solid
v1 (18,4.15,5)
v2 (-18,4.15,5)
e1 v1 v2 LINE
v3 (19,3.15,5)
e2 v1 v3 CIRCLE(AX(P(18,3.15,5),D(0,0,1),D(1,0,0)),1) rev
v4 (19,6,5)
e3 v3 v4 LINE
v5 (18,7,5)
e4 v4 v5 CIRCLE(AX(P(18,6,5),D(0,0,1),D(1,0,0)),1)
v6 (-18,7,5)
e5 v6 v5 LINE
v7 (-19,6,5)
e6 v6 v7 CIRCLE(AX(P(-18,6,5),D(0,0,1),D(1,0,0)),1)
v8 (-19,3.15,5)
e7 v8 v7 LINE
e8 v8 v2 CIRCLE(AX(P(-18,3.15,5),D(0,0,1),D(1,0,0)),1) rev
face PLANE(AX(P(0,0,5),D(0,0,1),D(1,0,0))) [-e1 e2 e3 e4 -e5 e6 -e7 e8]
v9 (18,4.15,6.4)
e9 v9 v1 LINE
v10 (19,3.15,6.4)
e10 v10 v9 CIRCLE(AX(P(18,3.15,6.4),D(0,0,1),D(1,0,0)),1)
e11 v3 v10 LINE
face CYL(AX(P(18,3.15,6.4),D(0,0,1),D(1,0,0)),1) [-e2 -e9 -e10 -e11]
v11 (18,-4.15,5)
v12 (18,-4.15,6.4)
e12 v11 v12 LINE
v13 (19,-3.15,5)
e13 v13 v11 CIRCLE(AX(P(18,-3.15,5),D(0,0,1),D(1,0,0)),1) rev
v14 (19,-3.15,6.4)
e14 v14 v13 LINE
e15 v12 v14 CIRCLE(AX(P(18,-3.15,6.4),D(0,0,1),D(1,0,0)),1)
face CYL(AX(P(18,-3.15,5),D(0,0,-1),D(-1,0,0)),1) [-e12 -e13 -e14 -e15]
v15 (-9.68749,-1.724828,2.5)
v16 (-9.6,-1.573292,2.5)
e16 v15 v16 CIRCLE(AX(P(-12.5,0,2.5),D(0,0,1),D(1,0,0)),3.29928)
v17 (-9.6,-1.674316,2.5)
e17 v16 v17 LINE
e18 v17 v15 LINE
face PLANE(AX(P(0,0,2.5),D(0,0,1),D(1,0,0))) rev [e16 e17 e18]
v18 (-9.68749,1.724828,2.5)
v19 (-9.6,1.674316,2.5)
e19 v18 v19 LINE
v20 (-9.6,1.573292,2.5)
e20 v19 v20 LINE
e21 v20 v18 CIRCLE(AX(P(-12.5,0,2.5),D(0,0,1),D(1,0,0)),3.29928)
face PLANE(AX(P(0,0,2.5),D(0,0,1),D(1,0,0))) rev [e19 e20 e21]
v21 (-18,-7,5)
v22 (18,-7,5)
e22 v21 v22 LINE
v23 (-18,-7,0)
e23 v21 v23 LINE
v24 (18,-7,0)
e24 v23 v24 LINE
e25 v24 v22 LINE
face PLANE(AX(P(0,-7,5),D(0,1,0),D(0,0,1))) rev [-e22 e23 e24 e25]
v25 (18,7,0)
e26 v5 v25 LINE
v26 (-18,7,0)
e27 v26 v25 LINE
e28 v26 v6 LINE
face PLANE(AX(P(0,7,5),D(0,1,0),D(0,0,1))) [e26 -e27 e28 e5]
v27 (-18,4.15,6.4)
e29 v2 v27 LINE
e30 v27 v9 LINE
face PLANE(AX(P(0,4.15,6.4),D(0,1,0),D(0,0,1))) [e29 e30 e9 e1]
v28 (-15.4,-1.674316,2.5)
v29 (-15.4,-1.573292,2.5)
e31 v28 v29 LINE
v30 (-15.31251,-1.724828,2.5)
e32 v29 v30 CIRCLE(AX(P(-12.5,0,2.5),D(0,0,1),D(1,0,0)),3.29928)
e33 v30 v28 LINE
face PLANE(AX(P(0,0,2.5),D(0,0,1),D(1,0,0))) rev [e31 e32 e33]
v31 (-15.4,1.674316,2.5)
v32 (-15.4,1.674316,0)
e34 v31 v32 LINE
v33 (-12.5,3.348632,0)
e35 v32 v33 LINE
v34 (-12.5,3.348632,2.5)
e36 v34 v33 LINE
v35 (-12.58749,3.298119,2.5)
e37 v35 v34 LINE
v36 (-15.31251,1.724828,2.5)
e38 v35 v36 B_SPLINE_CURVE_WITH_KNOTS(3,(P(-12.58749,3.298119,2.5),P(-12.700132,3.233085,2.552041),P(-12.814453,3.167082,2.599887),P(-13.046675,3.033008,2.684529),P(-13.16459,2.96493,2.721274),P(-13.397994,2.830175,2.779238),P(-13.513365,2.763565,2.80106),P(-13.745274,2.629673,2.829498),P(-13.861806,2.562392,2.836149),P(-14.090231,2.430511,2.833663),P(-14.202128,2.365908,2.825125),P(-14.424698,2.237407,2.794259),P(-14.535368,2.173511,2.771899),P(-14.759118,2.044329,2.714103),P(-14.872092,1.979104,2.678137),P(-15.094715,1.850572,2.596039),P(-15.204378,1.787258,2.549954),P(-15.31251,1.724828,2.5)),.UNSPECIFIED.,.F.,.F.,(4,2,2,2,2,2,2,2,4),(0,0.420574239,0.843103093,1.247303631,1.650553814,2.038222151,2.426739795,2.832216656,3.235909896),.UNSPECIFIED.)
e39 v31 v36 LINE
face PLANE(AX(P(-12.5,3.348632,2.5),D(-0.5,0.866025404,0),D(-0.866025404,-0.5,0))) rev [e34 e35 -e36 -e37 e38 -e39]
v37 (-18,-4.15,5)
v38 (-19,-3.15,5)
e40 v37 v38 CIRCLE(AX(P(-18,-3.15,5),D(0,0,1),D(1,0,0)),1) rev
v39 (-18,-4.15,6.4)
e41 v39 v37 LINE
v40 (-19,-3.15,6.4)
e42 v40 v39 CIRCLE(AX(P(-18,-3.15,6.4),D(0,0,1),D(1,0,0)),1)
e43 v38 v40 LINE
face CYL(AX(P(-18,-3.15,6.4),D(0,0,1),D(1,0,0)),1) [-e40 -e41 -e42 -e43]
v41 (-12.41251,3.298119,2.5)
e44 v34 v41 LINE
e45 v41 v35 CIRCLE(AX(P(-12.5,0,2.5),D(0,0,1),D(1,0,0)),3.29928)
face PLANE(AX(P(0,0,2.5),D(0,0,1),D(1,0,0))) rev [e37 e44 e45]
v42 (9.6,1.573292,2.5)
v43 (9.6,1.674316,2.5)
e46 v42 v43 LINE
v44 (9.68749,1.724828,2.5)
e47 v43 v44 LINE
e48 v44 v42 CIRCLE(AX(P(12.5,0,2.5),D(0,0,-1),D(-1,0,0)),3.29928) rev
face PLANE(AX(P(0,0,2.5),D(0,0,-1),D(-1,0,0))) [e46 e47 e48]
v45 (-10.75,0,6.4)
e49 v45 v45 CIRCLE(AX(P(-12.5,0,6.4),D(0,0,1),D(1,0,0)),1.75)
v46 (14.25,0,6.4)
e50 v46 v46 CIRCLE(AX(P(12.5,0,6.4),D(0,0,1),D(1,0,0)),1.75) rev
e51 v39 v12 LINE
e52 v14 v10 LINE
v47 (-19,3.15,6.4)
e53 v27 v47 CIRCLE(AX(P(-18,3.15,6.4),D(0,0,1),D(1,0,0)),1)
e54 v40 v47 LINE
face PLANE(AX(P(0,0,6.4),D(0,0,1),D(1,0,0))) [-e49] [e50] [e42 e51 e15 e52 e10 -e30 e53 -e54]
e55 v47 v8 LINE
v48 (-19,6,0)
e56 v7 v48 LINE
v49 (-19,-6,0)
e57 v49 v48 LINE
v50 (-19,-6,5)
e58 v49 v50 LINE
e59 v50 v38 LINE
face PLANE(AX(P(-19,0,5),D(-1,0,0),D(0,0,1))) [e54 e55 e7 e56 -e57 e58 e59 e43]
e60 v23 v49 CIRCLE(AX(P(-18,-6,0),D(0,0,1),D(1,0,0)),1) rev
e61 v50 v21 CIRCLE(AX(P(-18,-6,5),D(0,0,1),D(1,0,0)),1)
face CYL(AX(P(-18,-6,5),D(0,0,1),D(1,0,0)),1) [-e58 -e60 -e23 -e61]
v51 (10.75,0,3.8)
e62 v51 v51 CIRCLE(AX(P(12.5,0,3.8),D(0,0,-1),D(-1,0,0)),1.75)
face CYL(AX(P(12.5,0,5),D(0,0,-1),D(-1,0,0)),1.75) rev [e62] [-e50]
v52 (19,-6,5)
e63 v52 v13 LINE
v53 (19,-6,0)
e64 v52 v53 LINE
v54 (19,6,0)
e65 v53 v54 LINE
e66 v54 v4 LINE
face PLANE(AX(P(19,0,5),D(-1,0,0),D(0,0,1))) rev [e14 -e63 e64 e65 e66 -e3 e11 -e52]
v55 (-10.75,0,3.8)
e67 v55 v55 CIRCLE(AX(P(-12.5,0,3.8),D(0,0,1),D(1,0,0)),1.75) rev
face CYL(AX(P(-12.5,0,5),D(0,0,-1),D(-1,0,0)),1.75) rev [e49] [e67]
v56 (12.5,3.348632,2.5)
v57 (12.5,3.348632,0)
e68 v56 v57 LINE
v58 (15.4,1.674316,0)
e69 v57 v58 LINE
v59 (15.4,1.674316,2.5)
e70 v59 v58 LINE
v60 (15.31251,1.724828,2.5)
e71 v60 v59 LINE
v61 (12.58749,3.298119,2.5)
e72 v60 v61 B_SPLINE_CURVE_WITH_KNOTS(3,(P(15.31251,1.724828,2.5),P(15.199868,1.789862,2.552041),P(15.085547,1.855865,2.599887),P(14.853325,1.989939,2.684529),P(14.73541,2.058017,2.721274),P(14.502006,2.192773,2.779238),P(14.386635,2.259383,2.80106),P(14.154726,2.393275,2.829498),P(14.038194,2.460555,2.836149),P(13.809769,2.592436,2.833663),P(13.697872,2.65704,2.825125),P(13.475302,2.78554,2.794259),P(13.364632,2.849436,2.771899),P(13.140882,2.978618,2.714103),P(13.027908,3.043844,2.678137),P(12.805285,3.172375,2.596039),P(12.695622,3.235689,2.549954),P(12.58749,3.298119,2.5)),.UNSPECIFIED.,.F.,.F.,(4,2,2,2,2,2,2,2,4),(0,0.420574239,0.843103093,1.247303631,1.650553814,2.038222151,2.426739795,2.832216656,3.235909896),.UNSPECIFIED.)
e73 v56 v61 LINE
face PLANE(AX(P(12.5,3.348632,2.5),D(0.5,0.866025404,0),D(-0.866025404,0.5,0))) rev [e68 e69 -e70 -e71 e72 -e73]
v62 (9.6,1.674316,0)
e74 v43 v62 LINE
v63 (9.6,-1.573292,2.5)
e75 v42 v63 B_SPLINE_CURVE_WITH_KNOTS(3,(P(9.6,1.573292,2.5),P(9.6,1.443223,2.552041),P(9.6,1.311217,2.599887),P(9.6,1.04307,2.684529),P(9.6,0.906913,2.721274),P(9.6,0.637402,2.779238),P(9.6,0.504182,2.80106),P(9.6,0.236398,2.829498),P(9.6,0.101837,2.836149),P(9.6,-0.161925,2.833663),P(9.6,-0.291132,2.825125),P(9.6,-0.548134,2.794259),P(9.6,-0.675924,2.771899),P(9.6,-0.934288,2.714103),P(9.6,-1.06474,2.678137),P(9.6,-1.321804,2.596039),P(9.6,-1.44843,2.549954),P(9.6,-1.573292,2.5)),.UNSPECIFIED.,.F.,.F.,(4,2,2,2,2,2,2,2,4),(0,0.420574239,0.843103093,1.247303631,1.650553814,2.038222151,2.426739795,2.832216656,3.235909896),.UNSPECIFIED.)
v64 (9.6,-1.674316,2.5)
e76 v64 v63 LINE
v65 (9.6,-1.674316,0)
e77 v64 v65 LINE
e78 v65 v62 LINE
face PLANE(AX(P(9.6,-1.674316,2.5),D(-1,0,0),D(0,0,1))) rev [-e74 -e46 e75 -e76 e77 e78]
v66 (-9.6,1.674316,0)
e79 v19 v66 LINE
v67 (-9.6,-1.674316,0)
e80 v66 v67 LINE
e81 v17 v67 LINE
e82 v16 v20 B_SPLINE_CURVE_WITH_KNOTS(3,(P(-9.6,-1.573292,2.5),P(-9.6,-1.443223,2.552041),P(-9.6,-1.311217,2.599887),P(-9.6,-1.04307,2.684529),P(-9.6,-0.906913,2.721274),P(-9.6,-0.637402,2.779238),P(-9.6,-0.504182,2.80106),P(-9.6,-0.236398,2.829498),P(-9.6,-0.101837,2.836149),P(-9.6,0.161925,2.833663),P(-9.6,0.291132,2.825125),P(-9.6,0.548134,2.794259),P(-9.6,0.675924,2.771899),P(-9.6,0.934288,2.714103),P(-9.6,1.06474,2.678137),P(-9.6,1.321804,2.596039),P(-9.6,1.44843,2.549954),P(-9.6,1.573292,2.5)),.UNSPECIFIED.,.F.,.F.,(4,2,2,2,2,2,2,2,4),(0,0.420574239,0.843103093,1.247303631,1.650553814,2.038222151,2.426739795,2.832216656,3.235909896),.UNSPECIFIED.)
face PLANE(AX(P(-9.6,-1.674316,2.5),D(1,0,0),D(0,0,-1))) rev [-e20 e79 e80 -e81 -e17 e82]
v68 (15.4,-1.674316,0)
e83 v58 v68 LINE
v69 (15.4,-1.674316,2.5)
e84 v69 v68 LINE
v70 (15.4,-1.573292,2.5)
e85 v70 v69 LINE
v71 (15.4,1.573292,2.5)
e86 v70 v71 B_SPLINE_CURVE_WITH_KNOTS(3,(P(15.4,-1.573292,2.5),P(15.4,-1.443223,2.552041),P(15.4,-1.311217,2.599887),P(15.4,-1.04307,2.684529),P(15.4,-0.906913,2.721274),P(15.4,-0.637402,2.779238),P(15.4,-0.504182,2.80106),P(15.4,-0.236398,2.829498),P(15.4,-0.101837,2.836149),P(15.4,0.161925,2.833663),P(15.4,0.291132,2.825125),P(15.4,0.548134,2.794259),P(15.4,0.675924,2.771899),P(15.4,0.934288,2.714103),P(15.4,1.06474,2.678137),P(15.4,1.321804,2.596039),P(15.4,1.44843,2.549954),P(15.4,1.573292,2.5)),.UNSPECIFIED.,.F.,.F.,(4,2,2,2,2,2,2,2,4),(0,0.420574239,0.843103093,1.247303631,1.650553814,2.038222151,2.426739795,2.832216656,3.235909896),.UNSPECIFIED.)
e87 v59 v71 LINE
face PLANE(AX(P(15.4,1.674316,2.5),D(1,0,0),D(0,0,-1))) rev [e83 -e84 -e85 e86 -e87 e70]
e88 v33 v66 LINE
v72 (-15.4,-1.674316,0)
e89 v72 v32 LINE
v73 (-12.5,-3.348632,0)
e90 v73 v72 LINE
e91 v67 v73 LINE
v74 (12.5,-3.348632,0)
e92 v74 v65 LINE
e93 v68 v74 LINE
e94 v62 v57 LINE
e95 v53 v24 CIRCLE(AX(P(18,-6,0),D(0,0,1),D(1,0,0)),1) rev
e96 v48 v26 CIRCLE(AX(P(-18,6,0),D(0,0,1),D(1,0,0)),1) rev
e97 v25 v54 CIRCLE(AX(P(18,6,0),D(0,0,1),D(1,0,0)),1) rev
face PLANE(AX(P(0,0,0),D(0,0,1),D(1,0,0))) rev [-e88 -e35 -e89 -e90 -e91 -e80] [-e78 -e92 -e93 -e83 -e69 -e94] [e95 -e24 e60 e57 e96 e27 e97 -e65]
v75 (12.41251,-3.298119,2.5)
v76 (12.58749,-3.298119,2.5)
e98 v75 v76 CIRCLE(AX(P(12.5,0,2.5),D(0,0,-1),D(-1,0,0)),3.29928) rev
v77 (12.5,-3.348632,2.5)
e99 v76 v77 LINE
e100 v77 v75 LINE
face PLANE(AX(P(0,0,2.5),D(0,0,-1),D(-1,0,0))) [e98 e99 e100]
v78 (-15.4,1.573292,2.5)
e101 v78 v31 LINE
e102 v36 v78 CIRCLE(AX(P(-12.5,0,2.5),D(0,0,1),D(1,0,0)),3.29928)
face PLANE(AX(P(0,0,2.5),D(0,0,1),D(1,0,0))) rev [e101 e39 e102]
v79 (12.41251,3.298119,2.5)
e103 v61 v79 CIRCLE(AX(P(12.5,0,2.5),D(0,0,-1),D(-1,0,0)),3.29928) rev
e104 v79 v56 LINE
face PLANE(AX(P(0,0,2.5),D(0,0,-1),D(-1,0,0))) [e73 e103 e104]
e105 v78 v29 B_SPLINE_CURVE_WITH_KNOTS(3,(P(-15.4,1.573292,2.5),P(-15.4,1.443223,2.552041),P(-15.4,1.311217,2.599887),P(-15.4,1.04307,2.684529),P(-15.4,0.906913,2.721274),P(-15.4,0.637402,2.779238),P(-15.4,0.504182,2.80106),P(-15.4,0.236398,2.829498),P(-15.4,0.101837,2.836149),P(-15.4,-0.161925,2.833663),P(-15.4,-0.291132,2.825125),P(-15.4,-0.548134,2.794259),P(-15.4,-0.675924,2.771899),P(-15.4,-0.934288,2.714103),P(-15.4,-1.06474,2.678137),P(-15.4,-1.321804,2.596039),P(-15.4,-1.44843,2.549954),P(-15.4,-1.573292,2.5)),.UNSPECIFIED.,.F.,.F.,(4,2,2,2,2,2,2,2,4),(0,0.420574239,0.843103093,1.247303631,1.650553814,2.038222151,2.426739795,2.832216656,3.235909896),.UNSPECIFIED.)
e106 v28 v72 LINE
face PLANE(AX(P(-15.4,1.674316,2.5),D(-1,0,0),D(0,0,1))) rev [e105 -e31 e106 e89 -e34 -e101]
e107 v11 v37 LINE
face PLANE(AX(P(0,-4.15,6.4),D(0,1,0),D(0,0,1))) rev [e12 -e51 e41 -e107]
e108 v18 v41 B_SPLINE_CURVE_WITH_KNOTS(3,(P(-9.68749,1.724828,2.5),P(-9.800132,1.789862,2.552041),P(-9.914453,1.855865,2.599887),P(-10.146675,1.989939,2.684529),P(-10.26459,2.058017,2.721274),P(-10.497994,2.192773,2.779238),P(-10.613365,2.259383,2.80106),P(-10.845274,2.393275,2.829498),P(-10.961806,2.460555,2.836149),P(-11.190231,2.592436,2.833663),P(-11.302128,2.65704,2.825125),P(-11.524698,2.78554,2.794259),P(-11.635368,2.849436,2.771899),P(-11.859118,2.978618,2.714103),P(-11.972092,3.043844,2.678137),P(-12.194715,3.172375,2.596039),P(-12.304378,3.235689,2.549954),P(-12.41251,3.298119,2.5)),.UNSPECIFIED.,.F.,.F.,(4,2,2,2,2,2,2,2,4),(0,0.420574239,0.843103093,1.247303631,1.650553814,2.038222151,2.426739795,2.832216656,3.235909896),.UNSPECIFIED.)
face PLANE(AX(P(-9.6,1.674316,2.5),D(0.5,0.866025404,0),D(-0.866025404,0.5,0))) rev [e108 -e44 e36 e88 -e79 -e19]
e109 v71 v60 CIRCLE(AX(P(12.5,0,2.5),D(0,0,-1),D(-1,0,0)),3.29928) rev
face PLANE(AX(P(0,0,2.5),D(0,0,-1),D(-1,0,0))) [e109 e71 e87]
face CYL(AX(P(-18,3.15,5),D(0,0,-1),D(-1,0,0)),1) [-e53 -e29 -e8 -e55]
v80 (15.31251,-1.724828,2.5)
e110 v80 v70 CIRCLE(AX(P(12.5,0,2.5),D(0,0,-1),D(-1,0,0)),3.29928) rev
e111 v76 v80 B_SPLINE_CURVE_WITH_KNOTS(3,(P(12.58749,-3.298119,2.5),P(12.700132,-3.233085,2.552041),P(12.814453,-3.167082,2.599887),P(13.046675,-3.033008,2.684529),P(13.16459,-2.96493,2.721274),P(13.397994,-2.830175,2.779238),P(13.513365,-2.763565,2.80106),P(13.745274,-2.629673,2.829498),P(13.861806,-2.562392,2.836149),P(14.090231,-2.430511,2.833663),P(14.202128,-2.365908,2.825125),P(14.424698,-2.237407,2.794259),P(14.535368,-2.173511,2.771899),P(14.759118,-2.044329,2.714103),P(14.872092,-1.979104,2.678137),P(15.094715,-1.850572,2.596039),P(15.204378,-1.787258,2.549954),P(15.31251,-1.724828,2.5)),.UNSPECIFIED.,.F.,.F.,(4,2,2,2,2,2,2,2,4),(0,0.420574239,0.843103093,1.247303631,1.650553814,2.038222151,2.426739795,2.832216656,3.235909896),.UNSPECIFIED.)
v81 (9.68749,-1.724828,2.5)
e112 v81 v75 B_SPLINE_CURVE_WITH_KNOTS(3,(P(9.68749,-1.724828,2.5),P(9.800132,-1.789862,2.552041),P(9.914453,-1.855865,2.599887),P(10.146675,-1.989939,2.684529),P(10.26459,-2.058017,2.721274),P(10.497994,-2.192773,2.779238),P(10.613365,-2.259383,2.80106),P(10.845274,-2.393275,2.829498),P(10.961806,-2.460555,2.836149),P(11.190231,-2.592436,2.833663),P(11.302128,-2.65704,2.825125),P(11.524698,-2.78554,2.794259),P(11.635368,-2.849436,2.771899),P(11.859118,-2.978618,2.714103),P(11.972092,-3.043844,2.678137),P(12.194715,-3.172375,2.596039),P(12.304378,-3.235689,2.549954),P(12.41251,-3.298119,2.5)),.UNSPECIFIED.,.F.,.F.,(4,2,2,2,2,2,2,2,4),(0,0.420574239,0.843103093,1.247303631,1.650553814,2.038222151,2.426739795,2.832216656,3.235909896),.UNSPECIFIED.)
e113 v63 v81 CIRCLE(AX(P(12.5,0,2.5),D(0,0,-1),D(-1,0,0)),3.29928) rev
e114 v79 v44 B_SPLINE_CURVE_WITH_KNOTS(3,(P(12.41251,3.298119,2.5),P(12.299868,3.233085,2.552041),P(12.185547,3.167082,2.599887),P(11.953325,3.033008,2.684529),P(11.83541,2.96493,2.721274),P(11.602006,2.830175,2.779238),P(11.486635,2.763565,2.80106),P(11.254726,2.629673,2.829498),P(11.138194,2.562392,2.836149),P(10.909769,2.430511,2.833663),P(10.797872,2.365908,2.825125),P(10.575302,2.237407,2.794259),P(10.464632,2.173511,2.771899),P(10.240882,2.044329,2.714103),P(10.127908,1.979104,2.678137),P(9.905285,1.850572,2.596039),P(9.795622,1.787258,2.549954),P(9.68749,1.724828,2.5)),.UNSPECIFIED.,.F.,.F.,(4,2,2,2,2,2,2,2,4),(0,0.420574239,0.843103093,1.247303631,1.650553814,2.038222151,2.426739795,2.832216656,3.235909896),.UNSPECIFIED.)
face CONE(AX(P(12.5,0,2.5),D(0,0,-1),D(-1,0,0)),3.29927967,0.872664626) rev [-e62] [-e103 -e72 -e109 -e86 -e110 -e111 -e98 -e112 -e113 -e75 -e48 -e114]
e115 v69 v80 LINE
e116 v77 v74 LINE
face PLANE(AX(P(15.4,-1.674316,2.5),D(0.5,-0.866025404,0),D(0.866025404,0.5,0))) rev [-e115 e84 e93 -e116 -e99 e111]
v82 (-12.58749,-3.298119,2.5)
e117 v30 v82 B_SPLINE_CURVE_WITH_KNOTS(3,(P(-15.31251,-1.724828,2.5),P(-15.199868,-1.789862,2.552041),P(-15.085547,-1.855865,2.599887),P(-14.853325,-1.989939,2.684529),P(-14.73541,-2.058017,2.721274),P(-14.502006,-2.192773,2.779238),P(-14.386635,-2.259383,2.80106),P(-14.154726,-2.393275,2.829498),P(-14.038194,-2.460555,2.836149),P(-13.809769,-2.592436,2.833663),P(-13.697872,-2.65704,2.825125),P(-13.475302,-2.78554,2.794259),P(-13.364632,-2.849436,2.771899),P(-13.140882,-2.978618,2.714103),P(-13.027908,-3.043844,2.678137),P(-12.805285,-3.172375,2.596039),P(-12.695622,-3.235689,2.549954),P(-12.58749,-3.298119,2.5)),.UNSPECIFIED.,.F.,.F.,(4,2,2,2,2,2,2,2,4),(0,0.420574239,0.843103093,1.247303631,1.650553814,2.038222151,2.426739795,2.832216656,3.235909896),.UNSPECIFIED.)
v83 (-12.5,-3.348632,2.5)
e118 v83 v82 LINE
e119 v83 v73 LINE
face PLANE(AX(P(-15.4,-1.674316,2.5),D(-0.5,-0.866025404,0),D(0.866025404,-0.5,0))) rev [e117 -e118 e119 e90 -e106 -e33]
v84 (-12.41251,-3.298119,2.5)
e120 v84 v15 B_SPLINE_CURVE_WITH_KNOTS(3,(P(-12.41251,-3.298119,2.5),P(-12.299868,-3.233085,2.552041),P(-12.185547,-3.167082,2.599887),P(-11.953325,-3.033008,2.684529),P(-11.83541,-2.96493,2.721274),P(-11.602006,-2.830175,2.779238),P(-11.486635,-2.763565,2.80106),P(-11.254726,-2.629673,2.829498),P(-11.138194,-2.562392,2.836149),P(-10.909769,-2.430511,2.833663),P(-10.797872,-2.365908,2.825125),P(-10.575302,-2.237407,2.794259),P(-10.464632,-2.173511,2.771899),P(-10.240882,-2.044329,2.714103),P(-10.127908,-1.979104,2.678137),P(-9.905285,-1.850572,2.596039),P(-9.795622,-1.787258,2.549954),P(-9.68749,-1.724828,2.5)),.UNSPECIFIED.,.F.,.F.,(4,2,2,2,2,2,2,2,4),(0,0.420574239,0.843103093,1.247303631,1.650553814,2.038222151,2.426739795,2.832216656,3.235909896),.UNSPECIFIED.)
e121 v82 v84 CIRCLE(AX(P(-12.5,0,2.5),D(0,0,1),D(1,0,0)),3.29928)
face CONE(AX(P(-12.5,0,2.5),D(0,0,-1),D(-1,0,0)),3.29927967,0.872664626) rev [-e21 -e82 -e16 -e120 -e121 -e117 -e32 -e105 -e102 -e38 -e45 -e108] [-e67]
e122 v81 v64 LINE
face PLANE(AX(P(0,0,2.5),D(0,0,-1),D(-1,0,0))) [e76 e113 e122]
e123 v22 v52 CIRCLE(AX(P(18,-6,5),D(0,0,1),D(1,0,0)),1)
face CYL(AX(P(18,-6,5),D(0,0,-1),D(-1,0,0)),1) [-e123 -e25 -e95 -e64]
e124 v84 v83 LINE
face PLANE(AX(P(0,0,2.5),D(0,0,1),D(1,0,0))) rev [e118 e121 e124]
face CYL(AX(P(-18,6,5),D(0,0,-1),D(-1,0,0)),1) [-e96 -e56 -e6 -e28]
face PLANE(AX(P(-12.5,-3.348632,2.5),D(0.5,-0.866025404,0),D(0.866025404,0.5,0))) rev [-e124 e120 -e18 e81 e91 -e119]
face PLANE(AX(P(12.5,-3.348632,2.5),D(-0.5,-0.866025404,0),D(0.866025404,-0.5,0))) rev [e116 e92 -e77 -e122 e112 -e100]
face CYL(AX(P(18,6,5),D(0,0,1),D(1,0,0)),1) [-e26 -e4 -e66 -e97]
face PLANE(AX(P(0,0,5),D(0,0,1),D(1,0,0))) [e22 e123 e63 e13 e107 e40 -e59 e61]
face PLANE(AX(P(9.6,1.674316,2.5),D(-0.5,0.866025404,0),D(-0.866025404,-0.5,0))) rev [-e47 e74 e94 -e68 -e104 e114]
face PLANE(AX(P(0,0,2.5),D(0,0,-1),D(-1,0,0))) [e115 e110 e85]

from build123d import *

# Parameters (mm, degrees)
SKETCH_1_W          = 38
SKETCH_1_H          = 2.85
SKETCH_1_H_2        = 8.3
SKETCH_1_R          = 1.75
EXTRUDE_1_DEPTH     = 5
SKETCH_1_3_W        = 38
SKETCH_1_3_H        = 8.3
SKETCH_1_3_R        = 1.75
EXTRUDE_2_DEPTH     = 6.4
CUT_EXTRUDE_1_DEPTH = 2.5
FILLET_1_R          = 1
CHAMFER_1_SIZE      = 1.3
CHAMFER_1_SIZE_2    = 1.54927967


with BuildPart() as part:
    # Эскиз1 → Бобышка-Вытянуть1 (new body)
    # profile 1 of 3: a face of its own
    with BuildSketch(Plane.XY):
        with Locations((0, -5.575)):
            Rectangle(SKETCH_1_W, SKETCH_1_H)
    # profile 2 of 3: a face of its own
    with BuildSketch(Plane.XY):
        Rectangle(SKETCH_1_W, SKETCH_1_H_2)
        with Locations((-12.5, 0)):
            Circle(SKETCH_1_R, mode=Mode.SUBTRACT)
        with Locations((12.5, 0)):
            Circle(SKETCH_1_R, mode=Mode.SUBTRACT)
    # profile 3 of 3: a face of its own
    with BuildSketch(Plane.XY):
        with Locations((0, 5.575)):
            Rectangle(SKETCH_1_W, SKETCH_1_H)
    extrude(amount=EXTRUDE_1_DEPTH)

    # Эскиз1<3> → Бобышка-Вытянуть2 (add)
    with BuildSketch(Plane.XY):
        Rectangle(SKETCH_1_3_W, SKETCH_1_3_H)
        with Locations((-12.5, 0)):
            Circle(SKETCH_1_3_R, mode=Mode.SUBTRACT)
        with Locations((12.5, 0)):
            Circle(SKETCH_1_3_R, mode=Mode.SUBTRACT)
    extrude(amount=EXTRUDE_2_DEPTH)

    # Эскиз2 → Вырез-Вытянуть1 (cut)
    with BuildSketch(Plane(origin=(0, 0, 0), x_dir=(-1, 0, 0), z_dir=(0, 0, -1))):
        Polygon((-12.5, 3.348631561), (-15.4, 1.674315781), (-15.4, -1.674315781), (-12.5, -3.348631561), (-9.6, -1.674315781), (-9.6, 1.674315781), align=None)
        Polygon((9.6, 1.674315781), (12.5, 3.348631561), (15.4, 1.674315781), (15.4, -1.674315781), (12.5, -3.348631561), (9.6, -1.674315781), align=None)
    extrude(amount=-CUT_EXTRUDE_1_DEPTH, mode=Mode.SUBTRACT)

    # Скругление1
    fillet_1_edges = [part.edges().sort_by_distance(p)[0] for p in [
        (19, -7, 2.5),
        (-19, -7, 2.5),
        (-19, 7, 2.5),
        (19, 7, 2.5),
        (19, 4.15, 5.7),
        (-19, 4.15, 5.7),
        (-19, -4.15, 5.7),
        (19, -4.15, 5.7),
    ]]
    fillet(fillet_1_edges, radius=FILLET_1_R)

    # Фаска1
    # the kernel refuses this chamfer: 1.54927967, 1.3 mm, written as the material it takes off along each edge
    with BuildSketch(Plane(origin=(12.5, 0, 2.5), x_dir=(1, 0, 0), z_dir=(0, 1, 0))) as chamfer_1_piece_1_section:
        Polygon((1.75, -CHAMFER_1_SIZE), (1.75 + CHAMFER_1_SIZE_2, 0), (1.75, 0), align=None)
    chamfer_1_piece_1 = revolve(axis=Axis((12.5, 0, 2.5), (0, 0, -1)), mode=Mode.PRIVATE)
    chamfer_1_piece_1 = split(chamfer_1_piece_1, bisect_by=Plane(origin=(12.068379037, 3.597828041, 3.131156131), z_dir=(-0.4999999999999998, -0.8660254037844388, 0)), keep=Keep.TOP, mode=Mode.PRIVATE)
    chamfer_1_piece_1 = split(chamfer_1_piece_1, bisect_by=Plane(origin=(9.168379037, 1.425119301, 3.131156131), z_dir=(0.5000000000000004, -0.8660254037844385, 0)), keep=Keep.TOP, mode=Mode.PRIVATE)
    chamfer_1_piece_1 = split(chamfer_1_piece_1, bisect_by=Plane(origin=(15.4, 0, 3.131156131), z_dir=(-1, 0, 0)), keep=Keep.TOP, mode=Mode.PRIVATE)
    chamfer_1_piece_1 = split(chamfer_1_piece_1, bisect_by=Plane(origin=(9.6, 0, 3.131156131), z_dir=(1, 0, 0)), keep=Keep.TOP, mode=Mode.PRIVATE)
    chamfer_1_piece_1 = split(chamfer_1_piece_1, bisect_by=Plane(origin=(12.068379037, -3.597828041, 3.131156131), z_dir=(-0.4999999999999998, 0.8660254037844388, 0)), keep=Keep.TOP, mode=Mode.PRIVATE)
    chamfer_1_piece_1 = split(chamfer_1_piece_1, bisect_by=Plane(origin=(9.168379037, -1.425119301, 3.131156131), z_dir=(0.5000000000000001, 0.8660254037844386, 0)), keep=Keep.TOP, mode=Mode.PRIVATE)
    add(chamfer_1_piece_1, mode=Mode.SUBTRACT)
    with BuildSketch(Plane(origin=(-12.5, 0, 2.5), x_dir=(1, 0, 0), z_dir=(0, 1, 0))) as chamfer_1_piece_2_section:
        Polygon((1.75, -CHAMFER_1_SIZE), (1.75 + CHAMFER_1_SIZE_2, 0), (1.75, 0), align=None)
    chamfer_1_piece_2 = revolve(axis=Axis((-12.5, 0, 2.5), (0, 0, -1)), mode=Mode.PRIVATE)
    chamfer_1_piece_2 = split(chamfer_1_piece_2, bisect_by=Plane(origin=(-12.931620963, 3.597828041, 3.131156131), z_dir=(-0.5000000000000004, -0.8660254037844385, 0)), keep=Keep.TOP, mode=Mode.PRIVATE)
    chamfer_1_piece_2 = split(chamfer_1_piece_2, bisect_by=Plane(origin=(-9.6, 0, 3.131156131), z_dir=(-1, 0, 0)), keep=Keep.TOP, mode=Mode.PRIVATE)
    chamfer_1_piece_2 = split(chamfer_1_piece_2, bisect_by=Plane(origin=(-15.831620963, 1.425119301, 3.131156131), z_dir=(0.4999999999999998, -0.8660254037844388, 0)), keep=Keep.TOP, mode=Mode.PRIVATE)
    chamfer_1_piece_2 = split(chamfer_1_piece_2, bisect_by=Plane(origin=(-12.931620963, -3.597828041, 3.131156131), z_dir=(-0.5000000000000001, 0.8660254037844386, 0)), keep=Keep.TOP, mode=Mode.PRIVATE)
    chamfer_1_piece_2 = split(chamfer_1_piece_2, bisect_by=Plane(origin=(-15.4, 0, 3.131156131), z_dir=(1, 0, 0)), keep=Keep.TOP, mode=Mode.PRIVATE)
    chamfer_1_piece_2 = split(chamfer_1_piece_2, bisect_by=Plane(origin=(-15.831620963, -1.425119301, 3.131156131), z_dir=(0.4999999999999998, 0.8660254037844388, 0)), keep=Keep.TOP, mode=Mode.PRIVATE)
    add(chamfer_1_piece_2, mode=Mode.SUBTRACT)


solid = part.part
